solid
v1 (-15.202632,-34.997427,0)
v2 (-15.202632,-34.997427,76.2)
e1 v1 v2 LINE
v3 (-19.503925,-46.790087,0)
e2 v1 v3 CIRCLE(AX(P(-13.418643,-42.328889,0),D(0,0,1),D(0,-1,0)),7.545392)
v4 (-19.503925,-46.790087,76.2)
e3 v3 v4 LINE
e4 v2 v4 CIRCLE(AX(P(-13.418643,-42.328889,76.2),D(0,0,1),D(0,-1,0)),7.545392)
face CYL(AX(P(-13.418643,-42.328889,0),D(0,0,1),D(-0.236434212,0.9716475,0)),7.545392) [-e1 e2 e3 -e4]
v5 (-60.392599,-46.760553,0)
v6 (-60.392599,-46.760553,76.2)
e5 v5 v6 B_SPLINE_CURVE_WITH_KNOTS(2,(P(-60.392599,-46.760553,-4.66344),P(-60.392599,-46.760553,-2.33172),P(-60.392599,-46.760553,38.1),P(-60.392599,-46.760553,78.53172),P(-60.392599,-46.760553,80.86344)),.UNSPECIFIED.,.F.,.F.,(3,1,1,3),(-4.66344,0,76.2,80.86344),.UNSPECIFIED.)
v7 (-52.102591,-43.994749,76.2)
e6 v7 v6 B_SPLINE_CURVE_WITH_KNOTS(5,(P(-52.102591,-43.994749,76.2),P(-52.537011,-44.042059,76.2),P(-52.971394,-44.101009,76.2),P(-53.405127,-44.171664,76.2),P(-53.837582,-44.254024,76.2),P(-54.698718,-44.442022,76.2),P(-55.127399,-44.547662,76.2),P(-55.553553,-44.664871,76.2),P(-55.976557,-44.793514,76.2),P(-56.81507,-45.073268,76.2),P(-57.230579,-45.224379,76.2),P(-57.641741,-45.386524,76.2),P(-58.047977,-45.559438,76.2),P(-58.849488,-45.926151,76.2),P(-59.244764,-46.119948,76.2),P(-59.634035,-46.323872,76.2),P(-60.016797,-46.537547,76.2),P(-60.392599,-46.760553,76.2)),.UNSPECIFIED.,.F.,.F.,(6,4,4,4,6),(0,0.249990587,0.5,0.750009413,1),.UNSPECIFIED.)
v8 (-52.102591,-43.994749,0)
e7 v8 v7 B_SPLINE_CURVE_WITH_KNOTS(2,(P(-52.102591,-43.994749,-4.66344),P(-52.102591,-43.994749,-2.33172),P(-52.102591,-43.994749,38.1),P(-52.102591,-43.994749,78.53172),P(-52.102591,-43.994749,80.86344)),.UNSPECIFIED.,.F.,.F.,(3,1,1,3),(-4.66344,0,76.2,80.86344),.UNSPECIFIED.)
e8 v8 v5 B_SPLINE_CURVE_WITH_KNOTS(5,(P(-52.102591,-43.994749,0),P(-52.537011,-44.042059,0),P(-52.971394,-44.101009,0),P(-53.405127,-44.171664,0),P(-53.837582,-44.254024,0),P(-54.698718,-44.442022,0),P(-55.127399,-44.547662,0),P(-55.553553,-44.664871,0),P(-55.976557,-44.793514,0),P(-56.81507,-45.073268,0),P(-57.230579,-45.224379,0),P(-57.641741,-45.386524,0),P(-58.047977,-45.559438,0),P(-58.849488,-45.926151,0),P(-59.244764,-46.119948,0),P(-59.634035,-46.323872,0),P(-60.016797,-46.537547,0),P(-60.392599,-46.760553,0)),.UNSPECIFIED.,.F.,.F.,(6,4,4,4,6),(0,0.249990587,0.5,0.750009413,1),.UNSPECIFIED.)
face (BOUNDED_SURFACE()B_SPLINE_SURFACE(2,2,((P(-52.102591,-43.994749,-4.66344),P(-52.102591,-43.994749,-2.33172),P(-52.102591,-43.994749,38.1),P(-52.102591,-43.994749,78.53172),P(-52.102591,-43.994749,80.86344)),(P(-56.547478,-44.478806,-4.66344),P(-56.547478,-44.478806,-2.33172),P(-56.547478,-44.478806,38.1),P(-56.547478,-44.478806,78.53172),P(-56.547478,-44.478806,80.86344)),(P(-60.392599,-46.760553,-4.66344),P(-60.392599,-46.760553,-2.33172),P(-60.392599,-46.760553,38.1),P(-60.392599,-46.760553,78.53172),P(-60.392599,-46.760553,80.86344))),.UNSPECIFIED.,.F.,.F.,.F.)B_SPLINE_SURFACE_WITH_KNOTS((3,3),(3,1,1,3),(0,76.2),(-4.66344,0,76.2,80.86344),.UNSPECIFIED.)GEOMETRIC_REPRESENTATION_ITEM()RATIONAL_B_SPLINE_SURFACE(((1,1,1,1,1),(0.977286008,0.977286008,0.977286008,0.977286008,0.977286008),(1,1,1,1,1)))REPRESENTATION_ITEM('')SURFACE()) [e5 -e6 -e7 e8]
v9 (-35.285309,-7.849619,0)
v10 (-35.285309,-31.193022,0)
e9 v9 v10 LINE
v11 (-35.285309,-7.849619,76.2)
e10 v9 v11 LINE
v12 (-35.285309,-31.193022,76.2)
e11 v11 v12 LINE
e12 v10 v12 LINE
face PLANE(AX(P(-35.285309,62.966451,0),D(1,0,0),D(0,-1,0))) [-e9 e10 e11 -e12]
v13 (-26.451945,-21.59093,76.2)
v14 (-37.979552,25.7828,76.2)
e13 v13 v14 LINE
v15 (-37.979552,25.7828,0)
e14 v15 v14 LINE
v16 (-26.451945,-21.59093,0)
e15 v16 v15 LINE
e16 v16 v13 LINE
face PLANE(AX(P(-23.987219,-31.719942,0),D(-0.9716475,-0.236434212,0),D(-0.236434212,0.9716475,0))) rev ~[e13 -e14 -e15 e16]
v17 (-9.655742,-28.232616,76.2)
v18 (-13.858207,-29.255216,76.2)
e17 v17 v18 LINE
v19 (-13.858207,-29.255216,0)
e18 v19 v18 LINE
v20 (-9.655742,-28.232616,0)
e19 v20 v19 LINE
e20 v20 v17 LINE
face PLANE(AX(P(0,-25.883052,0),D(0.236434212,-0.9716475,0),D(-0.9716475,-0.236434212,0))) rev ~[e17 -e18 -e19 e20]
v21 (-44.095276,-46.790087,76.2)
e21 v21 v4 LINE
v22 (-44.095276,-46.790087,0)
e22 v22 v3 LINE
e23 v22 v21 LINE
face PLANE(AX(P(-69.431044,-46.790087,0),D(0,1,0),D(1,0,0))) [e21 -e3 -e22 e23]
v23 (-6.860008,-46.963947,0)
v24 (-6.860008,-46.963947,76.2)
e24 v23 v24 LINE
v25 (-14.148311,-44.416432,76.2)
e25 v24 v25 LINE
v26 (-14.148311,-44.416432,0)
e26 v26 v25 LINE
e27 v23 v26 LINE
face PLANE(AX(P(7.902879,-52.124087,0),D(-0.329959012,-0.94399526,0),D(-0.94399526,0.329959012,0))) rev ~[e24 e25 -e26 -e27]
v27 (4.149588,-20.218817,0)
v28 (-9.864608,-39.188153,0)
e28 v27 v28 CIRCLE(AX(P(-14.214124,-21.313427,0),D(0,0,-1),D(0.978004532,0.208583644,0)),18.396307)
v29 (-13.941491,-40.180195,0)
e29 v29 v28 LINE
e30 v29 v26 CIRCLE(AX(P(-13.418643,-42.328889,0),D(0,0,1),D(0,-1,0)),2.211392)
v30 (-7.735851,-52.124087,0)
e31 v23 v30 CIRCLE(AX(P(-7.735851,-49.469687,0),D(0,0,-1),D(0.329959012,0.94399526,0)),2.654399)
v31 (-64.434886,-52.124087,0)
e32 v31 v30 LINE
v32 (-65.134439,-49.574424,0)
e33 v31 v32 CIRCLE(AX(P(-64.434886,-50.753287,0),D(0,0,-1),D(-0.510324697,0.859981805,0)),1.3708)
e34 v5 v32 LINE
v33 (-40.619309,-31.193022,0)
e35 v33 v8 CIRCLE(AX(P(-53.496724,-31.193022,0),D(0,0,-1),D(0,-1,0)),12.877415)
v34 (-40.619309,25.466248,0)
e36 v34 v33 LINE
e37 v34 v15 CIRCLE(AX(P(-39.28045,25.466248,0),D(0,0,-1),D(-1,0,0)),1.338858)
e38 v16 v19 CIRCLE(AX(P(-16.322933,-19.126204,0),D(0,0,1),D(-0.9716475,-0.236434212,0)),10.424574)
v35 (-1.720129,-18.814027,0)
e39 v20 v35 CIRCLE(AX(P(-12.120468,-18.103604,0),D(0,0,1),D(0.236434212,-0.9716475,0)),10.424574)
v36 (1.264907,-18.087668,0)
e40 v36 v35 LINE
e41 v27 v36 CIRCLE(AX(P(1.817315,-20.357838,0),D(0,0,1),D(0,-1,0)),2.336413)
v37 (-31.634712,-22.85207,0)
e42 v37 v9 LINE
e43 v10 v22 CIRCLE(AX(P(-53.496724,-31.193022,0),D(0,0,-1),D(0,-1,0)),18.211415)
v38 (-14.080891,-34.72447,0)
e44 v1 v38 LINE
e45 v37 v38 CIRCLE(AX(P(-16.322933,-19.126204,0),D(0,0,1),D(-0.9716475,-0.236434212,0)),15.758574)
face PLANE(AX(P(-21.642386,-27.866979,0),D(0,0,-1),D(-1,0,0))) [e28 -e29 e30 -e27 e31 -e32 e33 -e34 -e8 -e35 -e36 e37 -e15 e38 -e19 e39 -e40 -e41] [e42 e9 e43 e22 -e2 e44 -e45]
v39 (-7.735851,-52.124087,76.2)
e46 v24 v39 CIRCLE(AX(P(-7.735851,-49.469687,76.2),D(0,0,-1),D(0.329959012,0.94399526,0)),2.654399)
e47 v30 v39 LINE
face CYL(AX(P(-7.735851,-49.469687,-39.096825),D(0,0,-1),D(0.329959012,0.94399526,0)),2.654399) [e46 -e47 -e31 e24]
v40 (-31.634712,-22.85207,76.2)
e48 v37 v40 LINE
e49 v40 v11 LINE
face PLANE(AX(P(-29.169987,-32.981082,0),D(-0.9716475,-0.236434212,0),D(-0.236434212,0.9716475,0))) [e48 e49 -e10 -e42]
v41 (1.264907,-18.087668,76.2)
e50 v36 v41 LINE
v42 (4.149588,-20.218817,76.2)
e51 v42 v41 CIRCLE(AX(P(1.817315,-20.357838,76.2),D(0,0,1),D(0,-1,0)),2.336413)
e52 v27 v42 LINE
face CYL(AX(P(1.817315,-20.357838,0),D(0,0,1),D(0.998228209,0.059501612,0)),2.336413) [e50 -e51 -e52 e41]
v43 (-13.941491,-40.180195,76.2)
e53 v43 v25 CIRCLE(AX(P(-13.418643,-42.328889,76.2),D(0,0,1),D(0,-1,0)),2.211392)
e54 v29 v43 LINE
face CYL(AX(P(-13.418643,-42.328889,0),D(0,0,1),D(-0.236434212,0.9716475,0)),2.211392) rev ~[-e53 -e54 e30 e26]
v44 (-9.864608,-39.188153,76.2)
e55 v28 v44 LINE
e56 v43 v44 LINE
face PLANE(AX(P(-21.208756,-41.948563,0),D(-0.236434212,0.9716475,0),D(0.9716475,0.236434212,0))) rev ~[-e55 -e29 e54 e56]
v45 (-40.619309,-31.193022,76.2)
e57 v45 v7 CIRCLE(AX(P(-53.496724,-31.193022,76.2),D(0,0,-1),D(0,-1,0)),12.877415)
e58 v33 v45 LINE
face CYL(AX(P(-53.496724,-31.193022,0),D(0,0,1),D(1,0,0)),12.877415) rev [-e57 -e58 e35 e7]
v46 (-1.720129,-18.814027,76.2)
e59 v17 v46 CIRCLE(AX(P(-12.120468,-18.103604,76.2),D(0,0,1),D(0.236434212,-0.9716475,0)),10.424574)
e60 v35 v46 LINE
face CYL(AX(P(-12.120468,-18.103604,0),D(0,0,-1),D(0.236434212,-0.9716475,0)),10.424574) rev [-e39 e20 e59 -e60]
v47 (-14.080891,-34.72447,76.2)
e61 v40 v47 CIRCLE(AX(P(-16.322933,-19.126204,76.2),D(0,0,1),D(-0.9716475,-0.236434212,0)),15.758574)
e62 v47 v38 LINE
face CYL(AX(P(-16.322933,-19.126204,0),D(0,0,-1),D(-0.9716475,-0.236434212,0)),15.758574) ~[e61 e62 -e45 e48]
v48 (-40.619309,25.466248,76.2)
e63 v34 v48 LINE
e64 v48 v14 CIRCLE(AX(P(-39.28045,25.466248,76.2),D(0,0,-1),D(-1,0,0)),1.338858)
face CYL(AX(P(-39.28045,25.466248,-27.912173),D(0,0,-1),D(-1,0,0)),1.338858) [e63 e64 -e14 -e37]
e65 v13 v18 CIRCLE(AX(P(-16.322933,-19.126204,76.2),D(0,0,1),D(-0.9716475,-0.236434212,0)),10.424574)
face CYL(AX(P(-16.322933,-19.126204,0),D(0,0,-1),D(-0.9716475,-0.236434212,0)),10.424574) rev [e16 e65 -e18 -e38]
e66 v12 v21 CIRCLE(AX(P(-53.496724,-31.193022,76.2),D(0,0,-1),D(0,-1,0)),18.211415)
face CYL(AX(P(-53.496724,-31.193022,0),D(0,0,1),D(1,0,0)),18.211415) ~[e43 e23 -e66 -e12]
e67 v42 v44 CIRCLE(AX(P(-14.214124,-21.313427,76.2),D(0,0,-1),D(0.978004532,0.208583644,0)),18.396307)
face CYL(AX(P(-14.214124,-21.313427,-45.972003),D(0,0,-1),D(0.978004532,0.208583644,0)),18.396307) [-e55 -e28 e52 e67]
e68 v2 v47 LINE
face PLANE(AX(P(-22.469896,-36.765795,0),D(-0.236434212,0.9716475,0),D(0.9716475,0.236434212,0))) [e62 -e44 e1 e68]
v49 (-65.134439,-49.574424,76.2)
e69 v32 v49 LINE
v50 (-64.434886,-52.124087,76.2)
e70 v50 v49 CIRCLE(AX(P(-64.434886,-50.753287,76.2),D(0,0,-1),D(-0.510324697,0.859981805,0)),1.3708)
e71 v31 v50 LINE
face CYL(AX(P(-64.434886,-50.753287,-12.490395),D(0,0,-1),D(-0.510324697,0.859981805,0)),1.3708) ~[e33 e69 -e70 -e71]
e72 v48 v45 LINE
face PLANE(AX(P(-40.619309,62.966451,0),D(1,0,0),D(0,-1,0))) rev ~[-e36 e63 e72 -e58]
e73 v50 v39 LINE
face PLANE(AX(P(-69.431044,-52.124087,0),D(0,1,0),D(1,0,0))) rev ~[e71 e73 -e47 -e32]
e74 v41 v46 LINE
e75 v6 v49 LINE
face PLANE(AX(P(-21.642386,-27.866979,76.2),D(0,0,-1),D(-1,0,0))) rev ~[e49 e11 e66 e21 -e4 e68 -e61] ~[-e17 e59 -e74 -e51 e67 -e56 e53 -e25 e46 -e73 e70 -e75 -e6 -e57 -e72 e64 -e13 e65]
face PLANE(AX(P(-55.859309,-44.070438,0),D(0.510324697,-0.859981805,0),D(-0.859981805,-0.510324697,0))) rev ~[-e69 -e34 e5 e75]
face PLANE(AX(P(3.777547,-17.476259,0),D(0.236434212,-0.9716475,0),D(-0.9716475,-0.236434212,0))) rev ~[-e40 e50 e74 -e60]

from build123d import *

# Parameters (mm, degrees)
F1_DEPTH     = 76.2
F2_DEPTH     = 15.24
F3_R         = 12.8774151417
F4_R         = 20.6186868219
F5_T1_DEPTH  = 101.180790156
F6_R         = 2.2113922374
F7_T1_DEPTH  = 154.3936506005
F8_T1_DEPTH  = 132.0243451665
F9_T1_DEPTH  = 76.2
F10_T1_DEPTH = 168.1440052245
F11_R        = 2.3364132001
F12_T        = -5.334


# Not quite as in the source:
# - a fillet or chamfer that OpenCascade refuses, or shapes differently, is made with other operations: its cross-section is extruded or revolved along the edge and cut away or added


with BuildPart() as f1:
    # F0 (on Top) → F1 (new body)
    with BuildSketch(Plane.XY):
        Polygon((-23.9872187376, -31.7199416459), (-47.0275729895, 62.9664510489), (-55.8593086898, 62.9664510489), (-55.8593086898, -44.0704375505), (-69.4310441613, -52.1240867674), (7.9028792679, -52.1240867674), (-21.2087563334, -41.9485626592), (8.002824487, -34.8404117285), (3.777547454, -17.4762585554), (-1.7201294546, -18.8140265274), (0, -25.8830520834), align=None)
    extrude(amount=F1_DEPTH)

    # F2 (cut): a face of the model
    f2_faces = [f1.faces().sort_by_distance(p)[0] for p in [
        (-55.8593086898, 9.4480067492, 38.1),
    ]]
    extrude(f2_faces, amount=-F2_DEPTH, mode=Mode.SUBTRACT)

    # F3
    f3_edges = [f1.edges().sort_by_distance(p)[0] for p in [
        (-40.619309, -44.070438, 38.1),
    ]]
    fillet(f3_edges, radius=F3_R)

    # F4
    f4_edges = [f1.edges().sort_by_distance(p)[0] for p in [
        (-55.859309, -44.070438, 38.1),
    ]]
    fillet(f4_edges, radius=F4_R)

    # F5: fillet of radius 1.3707998783 on 1 edges, made by hand

    # F5_s2 → F5_t1 (cut)
    with BuildSketch(Plane.XY.offset(-12.490395078)):
        with BuildLine():
            ThreePointArc((-65.1344391621, -49.5744239362), (-65.7568311931, -51.1159900142), (-64.4348861301, -52.1240867674))
            Line((-64.4348861301, -52.1240867674), (-69.4310441613, -52.1240867674))
            Line((-69.4310441613, -52.1240867674), (-65.1344391621, -49.5744239362))
        make_face()
    extrude(amount=F5_T1_DEPTH, mode=Mode.SUBTRACT)

    # F6
    f6_edges = [f1.edges().sort_by_distance(p)[0] for p in [
        (-21.208756, -41.948563, 38.1),
    ]]
    fillet(f6_edges, radius=F6_R)

    # F7: fillet of radius 2.6543994462 on 1 edges, made by hand

    # F7_s2 → F7_t1 (cut)
    with BuildSketch(Plane.XY.offset(-39.0968253003)):
        with BuildLine():
            ThreePointArc((-6.8600078332, -46.9639468268), (-5.1188800269, -49.913872102), (-7.7358508522, -52.1240867674))
            Line((-7.7358508522, -52.1240867674), (7.9028792679, -52.1240867674))
            Line((7.9028792679, -52.1240867674), (-6.8600078332, -46.9639468268))
        make_face()
    extrude(amount=F7_T1_DEPTH, mode=Mode.SUBTRACT)

    # F8: fillet of radius 1.3388584964 on 1 edges, made by hand

    # F8_s2 → F8_t1 (cut)
    with BuildSketch(Plane.XY.offset(-27.9121725832)):
        with BuildLine():
            ThreePointArc((-40.6193086898, 25.466247787), (-39.4398601206, 26.7955824133), (-37.979551683, 25.78279974))
            Line((-37.979551683, 25.78279974), (-40.6193086898, 36.6311168203))
            Line((-40.6193086898, 36.6311168203), (-40.6193086898, 25.466247787))
        make_face()
    extrude(amount=F8_T1_DEPTH, mode=Mode.SUBTRACT)

    # F9: fillet of radius 10.4245741623 on 2 edges, made by hand

    # F9_s2 → F9_t1 (join)
    with BuildSketch(Plane.XY):
        with BuildLine():
            ThreePointArc((-26.4519447103, -21.5909302259), (-21.7424015031, -28.031321364), (-13.8582073177, -29.2552156732))
            Line((-13.8582073177, -29.2552156732), (-23.9872187376, -31.7199416459))
            Line((-23.9872187376, -31.7199416459), (-26.4519447103, -21.5909302259))
        make_face()
        with BuildLine():
            ThreePointArc((-9.6557422738, -28.2326159037), (-4.1483336949, -24.8205098096), (-1.7201294546, -18.8140265274))
            Line((-1.7201294546, -18.8140265274), (0, -25.8830520834))
            Line((0, -25.8830520834), (-9.6557422738, -28.2326159037))
        make_face()
    extrude(amount=F9_T1_DEPTH)

    # F10: fillet of radius 18.3963073453 on 1 edges, made by hand

    # F10_s2 → F10_t1 (cut)
    with BuildSketch(Plane.XY.offset(-45.9720026122)):
        with BuildLine():
            ThreePointArc((3.777547454, -17.4762585554), (1.3625814789, -31.1006820929), (-9.8646080702, -39.1881534047))
            Line((-9.8646080702, -39.1881534047), (8.002824487, -34.8404117285))
            Line((8.002824487, -34.8404117285), (3.777547454, -17.4762585554))
        make_face()
    extrude(amount=F10_T1_DEPTH, mode=Mode.SUBTRACT)

    # F11
    f11_edges = [f1.edges().sort_by_distance(p)[0] for p in [
        (3.777547, -17.476259, 38.1),
    ]]
    fillet(f11_edges, radius=F11_R)

    # F12
    f12_openings = [f1.faces().sort_by_distance(p)[0] for p in [
        (-29.256427, -29.797459, 76.2),
        (-29.256427, -29.797459, 0),
    ]]
    offset(amount=F12_T, openings=f12_openings)


solid = f1.part
